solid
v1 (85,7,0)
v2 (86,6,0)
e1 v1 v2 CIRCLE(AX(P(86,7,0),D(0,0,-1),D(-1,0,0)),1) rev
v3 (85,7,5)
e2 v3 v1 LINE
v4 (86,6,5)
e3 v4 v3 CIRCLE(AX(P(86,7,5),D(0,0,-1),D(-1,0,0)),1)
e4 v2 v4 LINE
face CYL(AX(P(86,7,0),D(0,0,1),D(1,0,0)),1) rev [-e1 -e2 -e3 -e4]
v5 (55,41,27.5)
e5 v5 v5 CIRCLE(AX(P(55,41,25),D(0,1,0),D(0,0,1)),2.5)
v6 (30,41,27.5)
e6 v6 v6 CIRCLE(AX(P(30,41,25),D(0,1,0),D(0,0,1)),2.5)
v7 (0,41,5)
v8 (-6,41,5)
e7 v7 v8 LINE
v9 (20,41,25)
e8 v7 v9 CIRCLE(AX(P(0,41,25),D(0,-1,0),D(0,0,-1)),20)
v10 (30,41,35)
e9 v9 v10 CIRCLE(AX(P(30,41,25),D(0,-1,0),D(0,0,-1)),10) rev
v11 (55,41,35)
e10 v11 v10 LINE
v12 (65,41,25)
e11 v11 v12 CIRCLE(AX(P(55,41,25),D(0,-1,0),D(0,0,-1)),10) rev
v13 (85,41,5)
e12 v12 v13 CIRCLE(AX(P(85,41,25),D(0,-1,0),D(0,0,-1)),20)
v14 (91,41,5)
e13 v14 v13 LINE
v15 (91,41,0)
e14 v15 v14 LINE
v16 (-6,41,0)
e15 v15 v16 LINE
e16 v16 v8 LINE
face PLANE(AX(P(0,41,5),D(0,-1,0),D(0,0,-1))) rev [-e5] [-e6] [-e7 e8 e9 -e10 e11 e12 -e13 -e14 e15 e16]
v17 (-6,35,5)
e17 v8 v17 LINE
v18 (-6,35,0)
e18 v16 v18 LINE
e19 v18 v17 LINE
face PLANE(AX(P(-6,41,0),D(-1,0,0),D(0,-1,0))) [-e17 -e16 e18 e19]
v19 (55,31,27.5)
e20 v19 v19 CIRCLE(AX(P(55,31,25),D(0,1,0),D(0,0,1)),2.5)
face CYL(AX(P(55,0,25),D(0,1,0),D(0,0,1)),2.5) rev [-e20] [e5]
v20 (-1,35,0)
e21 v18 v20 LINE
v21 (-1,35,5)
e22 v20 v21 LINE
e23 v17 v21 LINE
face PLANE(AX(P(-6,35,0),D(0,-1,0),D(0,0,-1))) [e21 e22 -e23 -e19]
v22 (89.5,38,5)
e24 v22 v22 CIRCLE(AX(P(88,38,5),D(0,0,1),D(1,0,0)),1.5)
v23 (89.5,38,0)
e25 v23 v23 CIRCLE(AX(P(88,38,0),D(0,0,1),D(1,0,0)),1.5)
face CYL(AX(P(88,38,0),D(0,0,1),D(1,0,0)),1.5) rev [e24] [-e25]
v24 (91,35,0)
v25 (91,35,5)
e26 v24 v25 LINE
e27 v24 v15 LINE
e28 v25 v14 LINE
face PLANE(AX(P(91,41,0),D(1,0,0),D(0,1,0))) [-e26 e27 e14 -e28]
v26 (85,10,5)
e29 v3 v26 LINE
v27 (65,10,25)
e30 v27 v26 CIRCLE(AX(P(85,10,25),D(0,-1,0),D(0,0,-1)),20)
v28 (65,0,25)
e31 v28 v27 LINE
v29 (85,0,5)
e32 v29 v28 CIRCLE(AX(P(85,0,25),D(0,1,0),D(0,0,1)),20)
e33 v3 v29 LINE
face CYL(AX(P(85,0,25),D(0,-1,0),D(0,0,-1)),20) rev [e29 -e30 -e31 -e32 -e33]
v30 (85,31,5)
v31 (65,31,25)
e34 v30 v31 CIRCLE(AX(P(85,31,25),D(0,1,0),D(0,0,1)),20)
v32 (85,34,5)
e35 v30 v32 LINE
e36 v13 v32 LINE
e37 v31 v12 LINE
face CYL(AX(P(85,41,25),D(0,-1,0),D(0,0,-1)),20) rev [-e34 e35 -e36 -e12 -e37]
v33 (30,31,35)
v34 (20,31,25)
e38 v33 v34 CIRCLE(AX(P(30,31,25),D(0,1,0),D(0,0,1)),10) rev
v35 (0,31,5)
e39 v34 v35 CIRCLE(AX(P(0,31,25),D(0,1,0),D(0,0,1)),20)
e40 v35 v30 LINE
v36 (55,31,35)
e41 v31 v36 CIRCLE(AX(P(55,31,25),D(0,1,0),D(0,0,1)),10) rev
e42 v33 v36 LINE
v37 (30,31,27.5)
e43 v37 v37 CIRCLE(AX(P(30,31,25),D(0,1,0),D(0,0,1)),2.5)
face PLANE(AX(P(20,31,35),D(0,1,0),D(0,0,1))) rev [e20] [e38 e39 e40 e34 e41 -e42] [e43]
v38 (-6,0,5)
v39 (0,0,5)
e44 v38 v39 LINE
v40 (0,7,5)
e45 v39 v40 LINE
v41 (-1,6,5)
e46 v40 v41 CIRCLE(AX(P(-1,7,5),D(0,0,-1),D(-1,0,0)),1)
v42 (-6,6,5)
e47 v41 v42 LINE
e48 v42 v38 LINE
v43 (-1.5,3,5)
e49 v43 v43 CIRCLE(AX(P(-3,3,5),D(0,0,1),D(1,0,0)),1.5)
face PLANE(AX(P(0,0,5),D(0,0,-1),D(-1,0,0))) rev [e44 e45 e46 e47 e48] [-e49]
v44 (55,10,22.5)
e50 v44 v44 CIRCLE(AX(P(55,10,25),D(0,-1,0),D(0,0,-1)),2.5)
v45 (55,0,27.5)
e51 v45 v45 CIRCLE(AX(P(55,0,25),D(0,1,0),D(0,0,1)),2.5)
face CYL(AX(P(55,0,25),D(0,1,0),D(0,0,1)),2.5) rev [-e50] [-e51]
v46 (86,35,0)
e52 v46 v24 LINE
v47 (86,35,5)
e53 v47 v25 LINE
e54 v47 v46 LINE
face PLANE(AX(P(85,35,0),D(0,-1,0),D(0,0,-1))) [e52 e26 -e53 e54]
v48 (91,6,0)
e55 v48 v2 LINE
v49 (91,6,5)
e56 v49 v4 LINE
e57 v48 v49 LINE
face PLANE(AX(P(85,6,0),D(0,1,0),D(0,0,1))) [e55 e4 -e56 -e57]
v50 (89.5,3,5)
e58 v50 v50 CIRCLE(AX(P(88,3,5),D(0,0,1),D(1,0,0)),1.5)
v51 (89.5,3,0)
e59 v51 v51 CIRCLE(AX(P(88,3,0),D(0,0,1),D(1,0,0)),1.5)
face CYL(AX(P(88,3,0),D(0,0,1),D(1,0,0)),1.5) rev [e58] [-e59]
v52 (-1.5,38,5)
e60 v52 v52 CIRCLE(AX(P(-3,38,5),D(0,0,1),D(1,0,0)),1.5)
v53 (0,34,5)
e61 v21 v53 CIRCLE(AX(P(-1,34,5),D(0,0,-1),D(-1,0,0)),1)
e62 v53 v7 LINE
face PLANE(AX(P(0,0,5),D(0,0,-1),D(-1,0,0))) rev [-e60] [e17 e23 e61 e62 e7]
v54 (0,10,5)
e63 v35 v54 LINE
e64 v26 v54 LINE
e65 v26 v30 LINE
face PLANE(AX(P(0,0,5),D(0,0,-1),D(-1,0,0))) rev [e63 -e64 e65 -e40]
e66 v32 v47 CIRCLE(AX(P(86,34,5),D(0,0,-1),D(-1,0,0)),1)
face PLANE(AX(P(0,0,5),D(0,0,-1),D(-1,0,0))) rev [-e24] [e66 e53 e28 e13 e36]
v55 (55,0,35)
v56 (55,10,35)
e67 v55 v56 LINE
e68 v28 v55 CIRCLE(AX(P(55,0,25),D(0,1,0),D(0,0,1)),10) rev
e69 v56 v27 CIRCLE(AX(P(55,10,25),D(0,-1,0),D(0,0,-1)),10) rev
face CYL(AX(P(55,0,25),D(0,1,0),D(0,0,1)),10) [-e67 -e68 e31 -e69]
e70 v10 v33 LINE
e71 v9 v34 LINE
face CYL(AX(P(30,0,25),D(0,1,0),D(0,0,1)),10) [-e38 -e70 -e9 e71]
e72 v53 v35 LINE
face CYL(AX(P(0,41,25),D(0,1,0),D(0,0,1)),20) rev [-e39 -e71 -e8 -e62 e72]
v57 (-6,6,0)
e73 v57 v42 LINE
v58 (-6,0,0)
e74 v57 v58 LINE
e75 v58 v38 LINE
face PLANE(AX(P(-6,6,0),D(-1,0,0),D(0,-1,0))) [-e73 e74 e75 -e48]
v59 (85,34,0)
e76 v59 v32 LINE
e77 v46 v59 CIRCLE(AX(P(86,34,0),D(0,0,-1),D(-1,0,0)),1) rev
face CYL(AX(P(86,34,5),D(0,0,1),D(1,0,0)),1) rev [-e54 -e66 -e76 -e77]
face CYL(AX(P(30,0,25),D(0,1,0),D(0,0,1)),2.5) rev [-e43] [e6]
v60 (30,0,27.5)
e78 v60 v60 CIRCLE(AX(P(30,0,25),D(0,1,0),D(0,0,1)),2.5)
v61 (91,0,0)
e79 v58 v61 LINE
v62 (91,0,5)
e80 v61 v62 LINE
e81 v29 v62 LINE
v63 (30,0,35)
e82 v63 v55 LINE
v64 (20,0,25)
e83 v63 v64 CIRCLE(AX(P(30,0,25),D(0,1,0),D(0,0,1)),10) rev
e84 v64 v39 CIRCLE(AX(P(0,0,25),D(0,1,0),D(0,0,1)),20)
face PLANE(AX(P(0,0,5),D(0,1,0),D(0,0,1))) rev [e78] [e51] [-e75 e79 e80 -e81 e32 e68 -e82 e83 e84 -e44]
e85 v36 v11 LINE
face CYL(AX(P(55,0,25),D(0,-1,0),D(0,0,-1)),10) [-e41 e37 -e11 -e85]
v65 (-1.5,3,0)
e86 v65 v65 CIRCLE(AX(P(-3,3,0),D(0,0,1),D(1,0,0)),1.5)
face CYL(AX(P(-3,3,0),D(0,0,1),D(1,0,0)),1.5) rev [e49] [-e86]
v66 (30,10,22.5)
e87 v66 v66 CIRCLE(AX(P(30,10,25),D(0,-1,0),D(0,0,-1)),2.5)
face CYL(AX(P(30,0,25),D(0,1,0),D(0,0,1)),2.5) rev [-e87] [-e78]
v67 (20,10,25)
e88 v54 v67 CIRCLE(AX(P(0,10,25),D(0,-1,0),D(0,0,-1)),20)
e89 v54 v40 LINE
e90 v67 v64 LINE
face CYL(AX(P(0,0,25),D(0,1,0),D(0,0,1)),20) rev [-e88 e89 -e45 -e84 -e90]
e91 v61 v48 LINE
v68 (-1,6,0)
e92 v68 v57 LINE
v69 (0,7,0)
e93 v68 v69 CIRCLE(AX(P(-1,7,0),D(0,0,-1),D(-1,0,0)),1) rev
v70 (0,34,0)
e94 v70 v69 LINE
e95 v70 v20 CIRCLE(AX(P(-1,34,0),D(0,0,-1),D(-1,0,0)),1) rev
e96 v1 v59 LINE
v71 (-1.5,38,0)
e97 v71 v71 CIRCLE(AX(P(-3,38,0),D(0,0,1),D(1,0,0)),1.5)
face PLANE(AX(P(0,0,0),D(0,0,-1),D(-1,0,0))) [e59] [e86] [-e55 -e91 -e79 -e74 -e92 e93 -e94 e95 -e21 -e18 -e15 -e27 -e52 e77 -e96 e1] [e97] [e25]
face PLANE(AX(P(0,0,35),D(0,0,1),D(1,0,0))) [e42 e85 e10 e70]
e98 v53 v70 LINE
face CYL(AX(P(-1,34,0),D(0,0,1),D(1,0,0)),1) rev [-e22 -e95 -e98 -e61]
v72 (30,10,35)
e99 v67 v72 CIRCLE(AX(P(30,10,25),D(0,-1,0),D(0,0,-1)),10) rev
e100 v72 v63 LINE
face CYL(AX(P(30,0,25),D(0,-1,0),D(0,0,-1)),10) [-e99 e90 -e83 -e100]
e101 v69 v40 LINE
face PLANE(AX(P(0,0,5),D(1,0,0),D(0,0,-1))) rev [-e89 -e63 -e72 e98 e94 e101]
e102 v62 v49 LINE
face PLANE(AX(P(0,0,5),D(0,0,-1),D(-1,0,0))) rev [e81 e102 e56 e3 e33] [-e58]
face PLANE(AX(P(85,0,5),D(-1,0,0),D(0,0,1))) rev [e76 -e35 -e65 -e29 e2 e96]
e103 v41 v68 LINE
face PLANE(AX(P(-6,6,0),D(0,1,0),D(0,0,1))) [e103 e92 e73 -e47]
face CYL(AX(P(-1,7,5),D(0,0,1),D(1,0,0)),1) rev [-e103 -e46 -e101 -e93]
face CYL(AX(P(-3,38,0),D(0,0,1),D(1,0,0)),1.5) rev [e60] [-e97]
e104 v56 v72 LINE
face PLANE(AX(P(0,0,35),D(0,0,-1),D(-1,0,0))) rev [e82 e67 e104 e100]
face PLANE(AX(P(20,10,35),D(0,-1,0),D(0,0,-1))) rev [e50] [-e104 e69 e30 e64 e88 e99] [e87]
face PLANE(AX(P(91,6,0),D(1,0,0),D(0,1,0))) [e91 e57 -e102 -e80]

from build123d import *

# Parameters (mm, degrees)
SKETCH1_W            = 85
SKETCH1_H            = 41
BOSS_EXTRUDE1_DEPTH  = 5
SKETCH3_W            = 45
SKETCH3_H            = 10
BOSS_EXTRUDE3_DEPTH  = 30
SKETCH4_W            = 6
SKETCH4_H            = 6
SKETCH4_R            = 1.5
BOSS_EXTRUDE4_DEPTH  = 5
LPATTERN1_COUNT      = 2
LPATTERN1_PITCH      = 35
LPATTERN1_COUNT_DIR2 = 2
LPATTERN1_PITCH_DIR2 = 91
FILLET1_R            = 20
SKETCH5_R            = 2.5
CUT_EXTRUDE1_DEPTH   = 41
FILLET2_R            = 1
FILLET3_R            = 10


with BuildPart() as part:
    # Sketch1 → Boss-Extrude1 (new body)
    with BuildSketch(Plane.XY):
        with Locations((42.5, 20.5)):
            Rectangle(SKETCH1_W, SKETCH1_H)
    extrude(amount=BOSS_EXTRUDE1_DEPTH)

    # Sketch3 → Boss-Extrude3 (add)
    with BuildSketch(Plane.XY.offset(5)):
        with Locations((42.5, 36)):
            Rectangle(SKETCH3_W, SKETCH3_H)
        with Locations((42.5, 5)):
            Rectangle(SKETCH3_W, SKETCH3_H)
    extrude(amount=BOSS_EXTRUDE3_DEPTH)

    # Sketch4 → Boss-Extrude4 (add)
    with BuildSketch(Plane.XY.offset(5)):
        with Locations((-3, 38)):
            Rectangle(SKETCH4_W, SKETCH4_H)
        with Locations((-3, 38)):
            Circle(SKETCH4_R, mode=Mode.SUBTRACT)
    boss_extrude4 = extrude(amount=-BOSS_EXTRUDE4_DEPTH)

    # LPattern1: Boss-Extrude4 2 × 2
    with Locations(*[(j * LPATTERN1_PITCH_DIR2, -i * LPATTERN1_PITCH, 0) for i in range(LPATTERN1_COUNT) for j in range(LPATTERN1_COUNT_DIR2) if (i, j) != (0, 0)]):
        add(boss_extrude4)

    # Fillet1
    fillet1_edges = [part.edges().sort_by_distance(p)[0] for p in [
        (20, 36, 5),
        (65, 36, 5),
        (20, 5, 5),
        (65, 5, 5),
    ]]
    fillet(fillet1_edges, radius=FILLET1_R - 0.0001)  # a hair under: the kernel refuses the full size

    # Sketch5 → Cut-Extrude1 (cut)
    with BuildSketch(Plane(origin=(0, 41, 0), x_dir=(1, 0, 0), z_dir=(0, 1, 0))):
        with Locations(Location((30, -25, 0), (0, 0, 270))):
            Circle(SKETCH5_R)
        with Locations(Location((55, -25, 0), (0, 0, 270))):
            Circle(SKETCH5_R)
    extrude(amount=-CUT_EXTRUDE1_DEPTH, mode=Mode.SUBTRACT)

    # Fillet2
    fillet2_edges = [part.edges().sort_by_distance(p)[0] for p in [
        (0, 35, 2.5),
        (85, 35, 2.5),
        (0, 6, 2.5),
        (85, 6, 2.5),
    ]]
    fillet(fillet2_edges, radius=FILLET2_R)

    # Fillet3
    fillet3_edges = [part.edges().sort_by_distance(p)[0] for p in [
        (65, 5, 35),
        (20, 5, 35),
        (65, 36, 35),
        (20, 36, 35),
    ]]
    fillet(fillet3_edges, radius=FILLET3_R)


solid = part.part
